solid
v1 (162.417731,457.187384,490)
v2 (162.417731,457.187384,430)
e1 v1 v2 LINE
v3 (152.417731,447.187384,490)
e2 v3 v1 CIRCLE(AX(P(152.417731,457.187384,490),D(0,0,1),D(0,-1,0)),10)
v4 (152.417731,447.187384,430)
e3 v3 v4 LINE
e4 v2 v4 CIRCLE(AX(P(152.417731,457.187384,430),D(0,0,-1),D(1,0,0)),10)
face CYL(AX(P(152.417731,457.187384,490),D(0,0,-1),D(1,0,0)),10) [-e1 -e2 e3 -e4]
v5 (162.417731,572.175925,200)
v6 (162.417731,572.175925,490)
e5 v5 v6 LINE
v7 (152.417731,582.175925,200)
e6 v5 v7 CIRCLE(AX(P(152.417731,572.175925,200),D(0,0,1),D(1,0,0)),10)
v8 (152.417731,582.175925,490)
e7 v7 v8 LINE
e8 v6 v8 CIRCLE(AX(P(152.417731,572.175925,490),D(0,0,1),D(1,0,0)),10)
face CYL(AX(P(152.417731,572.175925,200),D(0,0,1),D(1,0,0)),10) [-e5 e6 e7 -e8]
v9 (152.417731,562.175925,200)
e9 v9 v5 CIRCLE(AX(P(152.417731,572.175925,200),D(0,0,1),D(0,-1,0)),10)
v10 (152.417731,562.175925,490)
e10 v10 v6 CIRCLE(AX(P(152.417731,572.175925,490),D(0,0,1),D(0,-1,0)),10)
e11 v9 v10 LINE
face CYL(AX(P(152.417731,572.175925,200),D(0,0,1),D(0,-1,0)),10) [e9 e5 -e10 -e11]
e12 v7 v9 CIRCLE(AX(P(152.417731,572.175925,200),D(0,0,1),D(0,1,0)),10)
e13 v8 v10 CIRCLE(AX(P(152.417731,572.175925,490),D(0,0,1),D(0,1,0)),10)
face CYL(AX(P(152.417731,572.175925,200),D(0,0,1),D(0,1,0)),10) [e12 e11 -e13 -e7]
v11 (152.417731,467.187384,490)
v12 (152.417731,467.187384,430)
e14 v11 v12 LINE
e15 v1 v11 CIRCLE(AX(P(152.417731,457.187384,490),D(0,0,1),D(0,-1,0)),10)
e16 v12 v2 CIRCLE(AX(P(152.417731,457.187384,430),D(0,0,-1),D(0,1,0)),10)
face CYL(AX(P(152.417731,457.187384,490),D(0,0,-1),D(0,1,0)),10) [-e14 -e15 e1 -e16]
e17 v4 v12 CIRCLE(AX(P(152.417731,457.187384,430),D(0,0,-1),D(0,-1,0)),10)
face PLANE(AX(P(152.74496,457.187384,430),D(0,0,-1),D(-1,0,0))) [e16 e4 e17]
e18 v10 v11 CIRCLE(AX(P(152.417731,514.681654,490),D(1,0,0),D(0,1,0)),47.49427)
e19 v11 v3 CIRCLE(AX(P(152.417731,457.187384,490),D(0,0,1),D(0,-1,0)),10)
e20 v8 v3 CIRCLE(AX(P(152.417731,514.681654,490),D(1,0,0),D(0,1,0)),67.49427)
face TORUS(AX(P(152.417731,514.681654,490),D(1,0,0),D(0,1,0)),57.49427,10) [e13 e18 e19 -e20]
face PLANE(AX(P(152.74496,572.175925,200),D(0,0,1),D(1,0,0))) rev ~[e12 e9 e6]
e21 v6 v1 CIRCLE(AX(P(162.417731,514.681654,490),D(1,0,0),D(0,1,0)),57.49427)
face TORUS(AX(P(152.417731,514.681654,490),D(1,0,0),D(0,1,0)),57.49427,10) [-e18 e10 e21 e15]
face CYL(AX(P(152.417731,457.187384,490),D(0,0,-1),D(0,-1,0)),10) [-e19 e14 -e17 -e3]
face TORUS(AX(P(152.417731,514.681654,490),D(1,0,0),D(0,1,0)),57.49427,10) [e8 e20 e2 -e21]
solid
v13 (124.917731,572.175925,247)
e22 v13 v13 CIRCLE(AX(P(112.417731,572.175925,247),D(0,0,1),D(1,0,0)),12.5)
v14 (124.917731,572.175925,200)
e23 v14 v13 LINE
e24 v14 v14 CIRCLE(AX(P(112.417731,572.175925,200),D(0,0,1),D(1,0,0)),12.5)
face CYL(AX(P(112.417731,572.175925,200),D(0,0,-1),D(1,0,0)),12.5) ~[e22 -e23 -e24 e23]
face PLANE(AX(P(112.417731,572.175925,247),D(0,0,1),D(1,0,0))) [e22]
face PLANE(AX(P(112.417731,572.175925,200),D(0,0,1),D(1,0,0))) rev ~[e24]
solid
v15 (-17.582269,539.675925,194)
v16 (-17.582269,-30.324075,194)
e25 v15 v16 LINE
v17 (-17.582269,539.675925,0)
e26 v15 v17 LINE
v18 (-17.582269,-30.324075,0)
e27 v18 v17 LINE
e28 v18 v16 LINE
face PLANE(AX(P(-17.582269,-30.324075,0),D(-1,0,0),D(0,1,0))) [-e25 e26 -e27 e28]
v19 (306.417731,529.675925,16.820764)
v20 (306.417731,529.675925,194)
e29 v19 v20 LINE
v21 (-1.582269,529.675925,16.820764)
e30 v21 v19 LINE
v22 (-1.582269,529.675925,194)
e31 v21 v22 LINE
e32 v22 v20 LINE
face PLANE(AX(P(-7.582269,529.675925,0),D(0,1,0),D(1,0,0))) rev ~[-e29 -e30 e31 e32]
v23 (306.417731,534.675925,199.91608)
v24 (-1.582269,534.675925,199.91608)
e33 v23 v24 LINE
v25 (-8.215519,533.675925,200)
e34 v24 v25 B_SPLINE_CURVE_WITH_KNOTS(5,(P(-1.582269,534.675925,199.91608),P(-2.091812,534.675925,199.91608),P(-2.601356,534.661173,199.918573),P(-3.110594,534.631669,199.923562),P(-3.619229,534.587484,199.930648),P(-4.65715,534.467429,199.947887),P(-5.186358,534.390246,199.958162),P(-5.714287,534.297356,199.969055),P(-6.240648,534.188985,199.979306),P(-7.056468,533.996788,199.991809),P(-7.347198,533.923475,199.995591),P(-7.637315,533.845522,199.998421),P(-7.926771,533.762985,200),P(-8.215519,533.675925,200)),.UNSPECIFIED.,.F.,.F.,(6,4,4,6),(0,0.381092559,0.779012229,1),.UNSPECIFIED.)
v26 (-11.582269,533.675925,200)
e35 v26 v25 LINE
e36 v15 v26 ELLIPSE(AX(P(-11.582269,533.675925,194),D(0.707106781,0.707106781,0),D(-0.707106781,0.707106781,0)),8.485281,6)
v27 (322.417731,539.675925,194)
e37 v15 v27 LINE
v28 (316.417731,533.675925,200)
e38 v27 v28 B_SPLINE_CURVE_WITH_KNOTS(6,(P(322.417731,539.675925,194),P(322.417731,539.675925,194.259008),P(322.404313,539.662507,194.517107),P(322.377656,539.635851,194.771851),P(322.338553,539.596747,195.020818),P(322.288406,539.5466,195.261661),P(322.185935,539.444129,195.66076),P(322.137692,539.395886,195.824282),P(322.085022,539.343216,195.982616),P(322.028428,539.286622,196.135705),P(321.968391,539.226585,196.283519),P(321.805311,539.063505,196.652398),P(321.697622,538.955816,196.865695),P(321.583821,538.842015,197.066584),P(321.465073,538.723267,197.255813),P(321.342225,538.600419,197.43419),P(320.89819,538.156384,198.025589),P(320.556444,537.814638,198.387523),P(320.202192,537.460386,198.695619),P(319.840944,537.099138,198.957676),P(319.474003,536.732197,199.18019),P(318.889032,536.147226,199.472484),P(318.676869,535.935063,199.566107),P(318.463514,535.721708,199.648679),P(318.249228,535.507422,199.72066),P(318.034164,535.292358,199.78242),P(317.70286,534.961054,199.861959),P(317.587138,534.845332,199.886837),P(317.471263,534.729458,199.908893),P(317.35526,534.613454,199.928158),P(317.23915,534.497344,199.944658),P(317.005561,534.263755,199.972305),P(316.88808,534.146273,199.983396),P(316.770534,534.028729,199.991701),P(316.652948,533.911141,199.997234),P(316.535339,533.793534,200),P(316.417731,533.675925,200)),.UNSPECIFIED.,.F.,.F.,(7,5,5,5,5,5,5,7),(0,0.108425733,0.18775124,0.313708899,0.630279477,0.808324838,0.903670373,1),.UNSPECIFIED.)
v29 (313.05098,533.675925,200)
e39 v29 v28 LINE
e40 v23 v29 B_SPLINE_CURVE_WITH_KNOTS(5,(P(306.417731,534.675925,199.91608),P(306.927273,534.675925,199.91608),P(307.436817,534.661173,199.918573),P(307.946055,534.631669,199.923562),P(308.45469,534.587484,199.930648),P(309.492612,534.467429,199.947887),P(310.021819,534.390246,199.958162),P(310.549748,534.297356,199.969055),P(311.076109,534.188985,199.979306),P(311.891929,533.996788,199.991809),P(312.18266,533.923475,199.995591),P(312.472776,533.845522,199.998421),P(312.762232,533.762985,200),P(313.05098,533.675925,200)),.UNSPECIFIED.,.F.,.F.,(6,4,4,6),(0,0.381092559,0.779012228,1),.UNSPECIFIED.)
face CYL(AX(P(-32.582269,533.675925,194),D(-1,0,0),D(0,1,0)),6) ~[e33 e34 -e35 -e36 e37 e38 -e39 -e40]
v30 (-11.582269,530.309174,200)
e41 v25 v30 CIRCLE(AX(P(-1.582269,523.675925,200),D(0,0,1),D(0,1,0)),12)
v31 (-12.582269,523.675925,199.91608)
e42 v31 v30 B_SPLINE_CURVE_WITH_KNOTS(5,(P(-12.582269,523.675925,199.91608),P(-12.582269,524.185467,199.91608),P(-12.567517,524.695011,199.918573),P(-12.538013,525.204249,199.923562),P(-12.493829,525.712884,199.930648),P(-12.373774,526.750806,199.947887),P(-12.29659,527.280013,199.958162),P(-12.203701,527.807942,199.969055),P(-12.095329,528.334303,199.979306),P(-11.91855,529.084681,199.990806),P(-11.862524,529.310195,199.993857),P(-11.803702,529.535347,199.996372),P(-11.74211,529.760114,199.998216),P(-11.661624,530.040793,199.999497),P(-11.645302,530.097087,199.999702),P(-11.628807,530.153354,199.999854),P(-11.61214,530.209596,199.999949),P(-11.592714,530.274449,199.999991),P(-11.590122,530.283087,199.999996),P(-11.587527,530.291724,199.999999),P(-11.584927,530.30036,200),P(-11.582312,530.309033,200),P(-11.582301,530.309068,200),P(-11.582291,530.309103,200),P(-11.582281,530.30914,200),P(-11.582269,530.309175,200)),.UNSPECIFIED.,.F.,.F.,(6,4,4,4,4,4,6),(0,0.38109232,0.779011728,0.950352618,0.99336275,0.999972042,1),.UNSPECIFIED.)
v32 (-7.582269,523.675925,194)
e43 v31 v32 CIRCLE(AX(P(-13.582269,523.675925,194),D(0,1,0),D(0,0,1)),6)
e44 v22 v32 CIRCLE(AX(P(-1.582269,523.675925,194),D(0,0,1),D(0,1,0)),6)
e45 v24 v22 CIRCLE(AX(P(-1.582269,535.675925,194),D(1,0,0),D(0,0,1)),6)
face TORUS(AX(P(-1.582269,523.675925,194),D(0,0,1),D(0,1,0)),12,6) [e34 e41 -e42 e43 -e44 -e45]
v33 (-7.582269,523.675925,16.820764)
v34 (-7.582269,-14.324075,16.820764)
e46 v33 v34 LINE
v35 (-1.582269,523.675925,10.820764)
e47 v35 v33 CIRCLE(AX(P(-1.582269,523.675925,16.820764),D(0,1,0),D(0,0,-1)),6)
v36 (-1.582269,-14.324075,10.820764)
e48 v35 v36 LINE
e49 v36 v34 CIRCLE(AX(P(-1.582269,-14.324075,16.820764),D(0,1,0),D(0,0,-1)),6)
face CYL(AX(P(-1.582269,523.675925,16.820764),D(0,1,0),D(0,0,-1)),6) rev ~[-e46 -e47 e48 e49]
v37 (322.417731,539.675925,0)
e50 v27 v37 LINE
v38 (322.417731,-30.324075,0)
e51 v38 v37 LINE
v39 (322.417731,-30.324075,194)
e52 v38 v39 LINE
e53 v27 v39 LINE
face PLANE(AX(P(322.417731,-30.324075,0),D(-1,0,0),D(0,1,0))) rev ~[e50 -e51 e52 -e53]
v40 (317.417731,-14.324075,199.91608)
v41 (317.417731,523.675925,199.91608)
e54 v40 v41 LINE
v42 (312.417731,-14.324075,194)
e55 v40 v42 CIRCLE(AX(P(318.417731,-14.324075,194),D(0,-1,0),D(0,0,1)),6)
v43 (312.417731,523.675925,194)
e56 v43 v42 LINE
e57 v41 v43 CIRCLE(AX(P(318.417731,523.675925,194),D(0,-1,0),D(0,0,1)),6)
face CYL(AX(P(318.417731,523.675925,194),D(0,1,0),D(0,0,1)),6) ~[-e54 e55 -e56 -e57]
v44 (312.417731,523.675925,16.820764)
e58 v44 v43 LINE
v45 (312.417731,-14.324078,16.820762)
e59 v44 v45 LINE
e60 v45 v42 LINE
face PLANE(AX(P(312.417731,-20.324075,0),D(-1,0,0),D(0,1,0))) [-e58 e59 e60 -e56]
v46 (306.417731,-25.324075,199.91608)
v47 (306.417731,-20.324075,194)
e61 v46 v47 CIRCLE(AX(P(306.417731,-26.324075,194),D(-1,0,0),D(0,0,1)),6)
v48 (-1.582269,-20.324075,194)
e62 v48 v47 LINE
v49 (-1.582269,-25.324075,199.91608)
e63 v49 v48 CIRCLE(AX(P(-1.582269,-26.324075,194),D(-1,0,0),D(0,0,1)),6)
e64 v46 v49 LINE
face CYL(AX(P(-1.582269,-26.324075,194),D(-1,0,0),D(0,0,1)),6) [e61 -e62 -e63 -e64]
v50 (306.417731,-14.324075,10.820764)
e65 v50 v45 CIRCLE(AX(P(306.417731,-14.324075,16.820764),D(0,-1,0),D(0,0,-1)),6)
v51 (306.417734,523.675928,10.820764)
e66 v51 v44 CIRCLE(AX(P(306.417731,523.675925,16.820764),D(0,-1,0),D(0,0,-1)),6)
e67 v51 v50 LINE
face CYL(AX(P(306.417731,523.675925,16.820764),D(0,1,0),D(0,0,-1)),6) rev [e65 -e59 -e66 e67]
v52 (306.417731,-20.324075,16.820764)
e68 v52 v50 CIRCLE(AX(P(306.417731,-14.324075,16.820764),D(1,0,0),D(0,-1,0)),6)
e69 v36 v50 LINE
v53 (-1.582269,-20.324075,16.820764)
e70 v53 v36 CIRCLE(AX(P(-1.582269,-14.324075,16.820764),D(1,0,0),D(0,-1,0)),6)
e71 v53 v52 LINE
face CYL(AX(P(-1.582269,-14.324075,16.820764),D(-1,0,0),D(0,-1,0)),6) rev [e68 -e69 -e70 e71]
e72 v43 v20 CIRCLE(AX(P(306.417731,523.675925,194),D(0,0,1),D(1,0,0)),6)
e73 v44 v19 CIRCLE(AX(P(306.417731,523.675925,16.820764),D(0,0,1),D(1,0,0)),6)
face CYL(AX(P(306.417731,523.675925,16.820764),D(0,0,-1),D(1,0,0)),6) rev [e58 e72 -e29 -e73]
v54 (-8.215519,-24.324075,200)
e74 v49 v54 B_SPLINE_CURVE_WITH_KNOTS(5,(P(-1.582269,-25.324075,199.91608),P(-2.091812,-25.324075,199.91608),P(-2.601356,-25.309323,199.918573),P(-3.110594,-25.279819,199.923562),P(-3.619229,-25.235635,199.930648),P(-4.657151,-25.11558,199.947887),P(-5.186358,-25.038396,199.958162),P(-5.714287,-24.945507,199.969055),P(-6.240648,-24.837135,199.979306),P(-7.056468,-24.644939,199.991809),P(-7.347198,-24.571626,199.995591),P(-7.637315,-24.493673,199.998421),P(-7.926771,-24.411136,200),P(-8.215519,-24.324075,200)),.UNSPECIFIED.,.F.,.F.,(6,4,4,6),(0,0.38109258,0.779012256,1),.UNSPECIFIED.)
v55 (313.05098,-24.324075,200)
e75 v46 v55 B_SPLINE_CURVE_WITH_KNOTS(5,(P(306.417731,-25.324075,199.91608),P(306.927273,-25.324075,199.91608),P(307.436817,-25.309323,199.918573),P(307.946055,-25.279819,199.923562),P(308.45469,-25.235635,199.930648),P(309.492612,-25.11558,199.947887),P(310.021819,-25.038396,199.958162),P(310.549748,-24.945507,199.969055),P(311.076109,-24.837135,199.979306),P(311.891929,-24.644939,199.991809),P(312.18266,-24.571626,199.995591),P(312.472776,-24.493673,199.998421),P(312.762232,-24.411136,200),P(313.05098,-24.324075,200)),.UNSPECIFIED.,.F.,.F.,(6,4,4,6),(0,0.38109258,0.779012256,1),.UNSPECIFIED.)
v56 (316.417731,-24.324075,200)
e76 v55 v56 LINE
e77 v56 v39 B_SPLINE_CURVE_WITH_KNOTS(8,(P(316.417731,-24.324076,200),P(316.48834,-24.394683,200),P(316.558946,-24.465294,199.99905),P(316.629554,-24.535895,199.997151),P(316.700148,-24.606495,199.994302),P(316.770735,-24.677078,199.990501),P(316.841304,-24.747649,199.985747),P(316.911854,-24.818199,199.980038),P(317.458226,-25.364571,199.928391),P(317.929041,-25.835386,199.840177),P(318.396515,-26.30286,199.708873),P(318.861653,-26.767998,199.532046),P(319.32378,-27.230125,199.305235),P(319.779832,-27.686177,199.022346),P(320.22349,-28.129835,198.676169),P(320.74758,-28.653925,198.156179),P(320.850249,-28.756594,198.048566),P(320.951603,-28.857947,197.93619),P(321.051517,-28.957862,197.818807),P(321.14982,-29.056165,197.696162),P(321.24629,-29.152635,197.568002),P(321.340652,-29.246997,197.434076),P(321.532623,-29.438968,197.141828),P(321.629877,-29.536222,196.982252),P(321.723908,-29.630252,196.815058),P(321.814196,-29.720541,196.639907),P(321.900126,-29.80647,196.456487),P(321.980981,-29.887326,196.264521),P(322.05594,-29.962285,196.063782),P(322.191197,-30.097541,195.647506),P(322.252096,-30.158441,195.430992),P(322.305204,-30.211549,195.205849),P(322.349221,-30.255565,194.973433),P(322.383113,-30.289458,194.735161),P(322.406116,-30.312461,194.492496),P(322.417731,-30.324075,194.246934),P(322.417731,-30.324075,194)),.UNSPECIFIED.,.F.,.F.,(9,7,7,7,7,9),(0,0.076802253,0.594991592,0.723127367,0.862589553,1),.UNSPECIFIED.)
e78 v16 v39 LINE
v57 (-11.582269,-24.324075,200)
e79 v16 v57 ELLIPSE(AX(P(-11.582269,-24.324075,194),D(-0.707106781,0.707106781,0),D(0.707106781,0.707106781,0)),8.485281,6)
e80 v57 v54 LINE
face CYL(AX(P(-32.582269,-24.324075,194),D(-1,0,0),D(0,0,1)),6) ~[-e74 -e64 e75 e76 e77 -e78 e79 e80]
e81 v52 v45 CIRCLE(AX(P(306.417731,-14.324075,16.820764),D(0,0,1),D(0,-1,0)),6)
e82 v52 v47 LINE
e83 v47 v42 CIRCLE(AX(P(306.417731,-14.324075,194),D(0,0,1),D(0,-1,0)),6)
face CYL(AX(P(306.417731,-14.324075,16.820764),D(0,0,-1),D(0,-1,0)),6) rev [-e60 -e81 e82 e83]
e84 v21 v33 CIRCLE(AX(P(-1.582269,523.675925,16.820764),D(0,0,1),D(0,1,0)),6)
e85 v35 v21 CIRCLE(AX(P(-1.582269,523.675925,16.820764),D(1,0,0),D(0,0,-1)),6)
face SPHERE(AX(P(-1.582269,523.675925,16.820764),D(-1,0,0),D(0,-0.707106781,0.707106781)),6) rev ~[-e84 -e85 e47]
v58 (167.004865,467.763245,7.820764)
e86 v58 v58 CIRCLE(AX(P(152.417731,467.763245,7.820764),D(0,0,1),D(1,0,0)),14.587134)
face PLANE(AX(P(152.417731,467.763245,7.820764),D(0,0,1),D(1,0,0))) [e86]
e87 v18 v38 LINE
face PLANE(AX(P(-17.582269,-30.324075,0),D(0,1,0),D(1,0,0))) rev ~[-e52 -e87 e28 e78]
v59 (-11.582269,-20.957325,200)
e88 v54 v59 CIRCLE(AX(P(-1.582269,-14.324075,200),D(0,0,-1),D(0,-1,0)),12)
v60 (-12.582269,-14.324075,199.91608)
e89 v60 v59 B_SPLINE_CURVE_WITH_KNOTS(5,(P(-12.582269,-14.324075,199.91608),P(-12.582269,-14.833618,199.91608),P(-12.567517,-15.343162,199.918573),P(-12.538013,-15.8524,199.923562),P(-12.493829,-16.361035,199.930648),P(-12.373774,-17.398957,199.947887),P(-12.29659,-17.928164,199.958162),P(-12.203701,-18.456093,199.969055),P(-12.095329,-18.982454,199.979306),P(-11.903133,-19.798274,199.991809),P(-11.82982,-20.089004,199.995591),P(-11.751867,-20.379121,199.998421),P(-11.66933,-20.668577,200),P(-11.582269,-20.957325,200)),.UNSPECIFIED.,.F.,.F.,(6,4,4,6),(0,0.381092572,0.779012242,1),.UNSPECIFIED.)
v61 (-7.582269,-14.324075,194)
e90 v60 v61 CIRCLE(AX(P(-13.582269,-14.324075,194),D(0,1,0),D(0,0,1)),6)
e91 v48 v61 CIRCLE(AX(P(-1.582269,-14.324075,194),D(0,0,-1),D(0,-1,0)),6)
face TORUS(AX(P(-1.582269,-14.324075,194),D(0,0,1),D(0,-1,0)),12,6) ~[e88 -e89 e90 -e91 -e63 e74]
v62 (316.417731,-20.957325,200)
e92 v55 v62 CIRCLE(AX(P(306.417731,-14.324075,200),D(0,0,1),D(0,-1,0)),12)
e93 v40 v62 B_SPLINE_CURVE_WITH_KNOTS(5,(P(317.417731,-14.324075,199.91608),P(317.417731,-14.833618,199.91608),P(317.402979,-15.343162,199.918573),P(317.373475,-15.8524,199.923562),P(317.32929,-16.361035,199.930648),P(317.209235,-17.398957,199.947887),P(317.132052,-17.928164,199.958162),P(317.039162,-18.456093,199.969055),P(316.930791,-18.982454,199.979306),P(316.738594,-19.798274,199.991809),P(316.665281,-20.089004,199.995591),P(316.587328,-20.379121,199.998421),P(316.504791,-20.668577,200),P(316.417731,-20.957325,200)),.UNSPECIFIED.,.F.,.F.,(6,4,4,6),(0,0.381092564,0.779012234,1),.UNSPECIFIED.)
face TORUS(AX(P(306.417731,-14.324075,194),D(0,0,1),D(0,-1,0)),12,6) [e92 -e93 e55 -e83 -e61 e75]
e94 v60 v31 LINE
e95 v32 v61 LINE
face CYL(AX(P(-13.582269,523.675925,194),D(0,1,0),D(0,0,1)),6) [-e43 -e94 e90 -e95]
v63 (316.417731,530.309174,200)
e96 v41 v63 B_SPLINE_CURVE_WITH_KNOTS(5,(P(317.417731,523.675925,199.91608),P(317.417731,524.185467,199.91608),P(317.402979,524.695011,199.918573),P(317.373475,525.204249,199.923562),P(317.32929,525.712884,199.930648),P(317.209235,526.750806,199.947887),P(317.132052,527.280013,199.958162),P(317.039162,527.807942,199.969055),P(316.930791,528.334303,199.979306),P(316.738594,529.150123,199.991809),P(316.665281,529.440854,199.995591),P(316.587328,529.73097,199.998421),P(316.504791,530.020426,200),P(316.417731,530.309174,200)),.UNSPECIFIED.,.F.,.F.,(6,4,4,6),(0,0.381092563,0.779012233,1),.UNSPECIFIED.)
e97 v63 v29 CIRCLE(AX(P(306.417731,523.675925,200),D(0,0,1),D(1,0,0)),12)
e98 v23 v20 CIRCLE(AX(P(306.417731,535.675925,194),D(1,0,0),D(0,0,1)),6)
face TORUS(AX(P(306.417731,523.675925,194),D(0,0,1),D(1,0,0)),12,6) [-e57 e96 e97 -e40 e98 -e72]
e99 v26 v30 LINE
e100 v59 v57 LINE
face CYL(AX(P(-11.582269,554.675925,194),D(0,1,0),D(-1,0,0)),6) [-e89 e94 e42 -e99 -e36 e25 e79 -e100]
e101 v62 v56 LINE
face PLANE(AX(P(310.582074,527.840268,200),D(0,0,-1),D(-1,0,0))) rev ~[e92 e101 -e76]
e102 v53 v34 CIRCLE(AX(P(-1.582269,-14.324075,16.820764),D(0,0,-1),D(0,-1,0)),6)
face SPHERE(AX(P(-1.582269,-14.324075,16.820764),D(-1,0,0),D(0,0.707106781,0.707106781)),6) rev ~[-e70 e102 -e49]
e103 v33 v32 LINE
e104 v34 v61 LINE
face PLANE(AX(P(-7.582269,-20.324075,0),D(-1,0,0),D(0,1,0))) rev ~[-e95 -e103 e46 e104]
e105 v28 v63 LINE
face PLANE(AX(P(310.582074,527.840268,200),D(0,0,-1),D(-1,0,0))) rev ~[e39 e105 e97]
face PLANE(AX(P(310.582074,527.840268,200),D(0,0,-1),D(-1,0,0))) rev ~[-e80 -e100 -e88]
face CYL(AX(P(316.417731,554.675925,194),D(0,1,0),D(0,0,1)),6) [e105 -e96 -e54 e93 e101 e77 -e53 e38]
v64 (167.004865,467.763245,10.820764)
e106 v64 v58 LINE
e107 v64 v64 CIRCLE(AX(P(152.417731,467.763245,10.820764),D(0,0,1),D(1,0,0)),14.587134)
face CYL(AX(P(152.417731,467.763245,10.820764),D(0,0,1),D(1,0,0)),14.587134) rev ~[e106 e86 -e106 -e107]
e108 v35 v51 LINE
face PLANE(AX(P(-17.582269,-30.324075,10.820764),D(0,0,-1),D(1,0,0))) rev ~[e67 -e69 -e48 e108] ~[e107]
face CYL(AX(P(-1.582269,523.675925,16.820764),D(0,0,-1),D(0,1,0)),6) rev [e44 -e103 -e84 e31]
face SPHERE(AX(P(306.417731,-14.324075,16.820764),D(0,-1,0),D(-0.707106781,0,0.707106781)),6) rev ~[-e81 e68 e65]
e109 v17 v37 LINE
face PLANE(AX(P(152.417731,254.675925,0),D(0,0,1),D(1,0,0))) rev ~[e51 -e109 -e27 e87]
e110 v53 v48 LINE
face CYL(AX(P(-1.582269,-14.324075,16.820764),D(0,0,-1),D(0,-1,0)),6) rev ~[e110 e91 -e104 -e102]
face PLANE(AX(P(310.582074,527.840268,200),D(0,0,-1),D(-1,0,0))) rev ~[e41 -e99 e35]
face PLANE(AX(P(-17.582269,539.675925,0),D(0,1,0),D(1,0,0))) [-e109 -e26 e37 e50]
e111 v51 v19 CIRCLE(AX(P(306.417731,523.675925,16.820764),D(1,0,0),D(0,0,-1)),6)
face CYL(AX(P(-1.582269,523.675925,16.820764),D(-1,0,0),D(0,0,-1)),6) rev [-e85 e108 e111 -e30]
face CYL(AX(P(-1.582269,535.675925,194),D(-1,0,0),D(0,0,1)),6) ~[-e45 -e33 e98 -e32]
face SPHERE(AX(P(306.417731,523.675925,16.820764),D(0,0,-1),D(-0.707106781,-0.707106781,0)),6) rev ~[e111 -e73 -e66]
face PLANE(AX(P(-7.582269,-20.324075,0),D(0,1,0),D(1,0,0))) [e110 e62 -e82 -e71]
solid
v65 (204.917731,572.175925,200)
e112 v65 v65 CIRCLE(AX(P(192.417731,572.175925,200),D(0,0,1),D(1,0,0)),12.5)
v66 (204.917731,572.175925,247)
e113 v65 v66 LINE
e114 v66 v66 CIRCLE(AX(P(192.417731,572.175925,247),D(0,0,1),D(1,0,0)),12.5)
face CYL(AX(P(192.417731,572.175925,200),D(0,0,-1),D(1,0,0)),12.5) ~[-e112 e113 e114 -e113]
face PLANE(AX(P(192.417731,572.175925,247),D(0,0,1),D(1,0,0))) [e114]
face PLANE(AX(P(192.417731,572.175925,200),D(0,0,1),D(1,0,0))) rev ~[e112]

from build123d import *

# Parameters (mm, degrees)
F0_W         = 340
F0_H         = 570
F0_W_2       = 320
F0_H_2       = 550
F1_DEPTH     = 200
F2_W         = 340
F2_H         = 10.8207641169
F3_DEPTH     = 570
F4_T1_DEPTH  = 538
F4_T3_DEPTH  = 308
F4_T5_DEPTH  = 183.1792358831
F4_S9_W      = 6
F4_S9_H      = 6
F4_T10_DEPTH = 6
F4_S15_W     = 6
F4_S15_H     = 6
F4_T16_DEPTH = 6
F4_S21_W     = 6
F4_S21_H     = 6
F4_T22_DEPTH = 6
F4_S27_W     = 6
F4_S27_H     = 6
F4_T28_DEPTH = 6
F4_T31_DEPTH = 600
F4_T33_DEPTH = 370
F4_T35_DEPTH = 538
F4_T37_DEPTH = 308
F4_T40_ANGLE = 90
F4_T42_ANGLE = 90
F4_T44_ANGLE = 90
F4_T46_ANGLE = 90
F5_R         = 14.5871340725
F6_DEPTH     = 3
F12_R        = 12.5
F13_DEPTH    = 47


# Not quite as in the source:
# - a fillet or chamfer that OpenCascade refuses, or shapes differently, is made with other operations: its cross-section is extruded or revolved along the edge and cut away or added


with BuildPart() as f1:
    # F0 (on Top) → F1 (new body)
    with BuildSketch(Plane.XY):
        with Locations((152.4177306145, 254.675924629)):
            Rectangle(F0_W, F0_H)
        with Locations((152.4177306145, 254.675924629)):
            Rectangle(F0_W_2, F0_H_2, mode=Mode.SUBTRACT)
    extrude(amount=F1_DEPTH)

    # F2 (on face) → F3 (join, through all)
    with BuildSketch(Plane.XZ.offset(30.324075371)):
        with Locations((152.4177306145, 5.4103820585)):
            Rectangle(F2_W, F2_H)
    extrude(amount=-F3_DEPTH)

    # F4: fillet of radius 6 on 16 edges, made by hand

    # F4_s2 → F4_t1 (join)
    with BuildSketch(Plane.XZ.offset(-523.675924629)):
        with BuildLine():
            ThreePointArc((-1.5822693855, 10.8207641169), (-5.8249100726, 12.5781234298), (-7.5822693855, 16.8207641169))
            Line((-7.5822693855, 16.8207641169), (-7.5822693855, 10.8207641169))
            Line((-7.5822693855, 10.8207641169), (-1.5822693855, 10.8207641169))
        make_face()
        with BuildLine():
            ThreePointArc((306.4177306145, 10.8207641169), (310.6603713017, 12.5781234298), (312.4177306145, 16.8207641169))
            Line((312.4177306145, 16.8207641169), (312.4177306145, 10.8207641169))
            Line((312.4177306145, 10.8207641169), (306.4177306145, 10.8207641169))
        make_face()
    extrude(amount=F4_T1_DEPTH)

    # F4_s4 → F4_t3 (join)
    with BuildSketch(Plane.YZ.offset(-1.5822693855)):
        with BuildLine():
            ThreePointArc((523.675924629, 10.8207641169), (527.9185653161, 12.5781234298), (529.675924629, 16.8207641169))
            Line((529.675924629, 16.8207641169), (529.675924629, 10.8207641169))
            Line((529.675924629, 10.8207641169), (523.675924629, 10.8207641169))
        make_face()
        with BuildLine():
            ThreePointArc((-20.324075371, 16.8207641169), (-18.5667160581, 12.5781234298), (-14.324075371, 10.8207641169))
            Line((-14.324075371, 10.8207641169), (-20.324075371, 10.8207641169))
            Line((-20.324075371, 10.8207641169), (-20.324075371, 16.8207641169))
        make_face()
    extrude(amount=F4_T3_DEPTH)

    # F4_s6 → F4_t5 (join)
    with BuildSketch(Plane.XY.offset(16.8207641169)):
        with BuildLine():
            ThreePointArc((312.4177306145, 523.675924629), (310.6603713017, 527.9185653161), (306.4177306145, 529.675924629))
            Line((306.4177306145, 529.675924629), (312.4177306145, 529.675924629))
            Line((312.4177306145, 529.675924629), (312.4177306145, 523.675924629))
        make_face()
        with BuildLine():
            ThreePointArc((-1.5822693855, 529.675924629), (-5.8249100726, 527.9185653161), (-7.5822693855, 523.675924629))
            Line((-7.5822693855, 523.675924629), (-7.5822693855, 529.675924629))
            Line((-7.5822693855, 529.675924629), (-1.5822693855, 529.675924629))
        make_face()
        with BuildLine():
            ThreePointArc((-1.5822693855, -20.324075371), (-5.8249100726, -18.5667160581), (-7.5822693855, -14.324075371))
            Line((-7.5822693855, -14.324075371), (-7.5822693855, -20.324075371))
            Line((-7.5822693855, -20.324075371), (-1.5822693855, -20.324075371))
        make_face()
        with BuildLine():
            ThreePointArc((306.4177306145, -20.324075371), (310.6603713017, -18.5667160581), (312.4177306145, -14.324075371))
            Line((312.4177306145, -14.324075371), (312.4177306145, -20.324075371))
            Line((312.4177306145, -20.324075371), (306.4177306145, -20.324075371))
        make_face()
    extrude(amount=F4_T5_DEPTH)


with BuildPart() as f4_tool8:
    # F4_s9 → F4_t10 (new body)
    with BuildSketch(Plane.YZ.offset(-1.5822693855)):
        with Locations((-17.324075371, 13.8207641169)):
            Rectangle(F4_S9_W, F4_S9_H)
    extrude(amount=-F4_T10_DEPTH)

    # F4_s11 → F4_t12 (revolve, cut)
    with BuildSketch(Plane(origin=(-1.5822693855, -14.324075371, 16.8207641169), x_dir=(0, 0.7071067812, 0.7071067812), z_dir=(0, -0.7071067812, 0.7071067812))):
        with BuildLine():
            ThreePointArc((0, -6), (6, 0), (0, 6))
            Line((0, 6), (0, -6))
        make_face()
    revolve(axis=Axis((-1.5822693855, -14.324075371, 16.8207641169), (-1, 0, 0)), mode=Mode.SUBTRACT)


with BuildPart() as f1_1:
    add(f1.part)

    # F4_t7: union F4_tool8
    add(f4_tool8.part)


with BuildPart() as f4_tool14:
    # F4_s15 → F4_t16 (new body)
    with BuildSketch(Plane.YZ.offset(-1.5822693855)):
        with Locations((526.675924629, 13.8207641169)):
            Rectangle(F4_S15_W, F4_S15_H)
    extrude(amount=-F4_T16_DEPTH)

    # F4_s17 → F4_t18 (revolve, cut)
    with BuildSketch(Plane(origin=(-1.5822693855, 523.675924629, 16.8207641169), x_dir=(0, -0.7071067812, 0.7071067812), z_dir=(0, -0.7071067812, -0.7071067812))):
        with BuildLine():
            ThreePointArc((0, -6), (6, 0), (0, 6))
            Line((0, 6), (0, -6))
        make_face()
    revolve(axis=Axis((-1.5822693855, 523.675924629, 16.8207641169), (-1, 0, 0)), mode=Mode.SUBTRACT)


with BuildPart() as f1_2:
    add(f1_1.part)

    # F4_t13: union F4_tool14
    add(f4_tool14.part)


with BuildPart() as f4_tool20:
    # F4_s21 → F4_t22 (new body)
    with BuildSketch(Plane.XY.offset(16.8207641169)):
        with Locations((309.4177306145, 526.675924629)):
            Rectangle(F4_S21_W, F4_S21_H)
    extrude(amount=-F4_T22_DEPTH)

    # F4_s23 → F4_t24 (revolve, cut)
    with BuildSketch(Plane(origin=(306.4177306145, 523.675924629, 16.8207641169), x_dir=(-0.7071067812, -0.7071067812, 0), z_dir=(0.7071067812, -0.7071067812, 0))):
        with BuildLine():
            ThreePointArc((0, -6), (6, 0), (0, 6))
            Line((0, 6), (0, -6))
        make_face()
    revolve(axis=Axis((306.4177306145, 523.675924629, 16.8207641169), (0, 0, -1)), mode=Mode.SUBTRACT)


with BuildPart() as f1_3:
    add(f1_2.part)

    # F4_t19: union F4_tool20
    add(f4_tool20.part)


with BuildPart() as f4_tool26:
    # F4_s27 → F4_t28 (new body)
    with BuildSketch(Plane.XZ.offset(14.324075371)):
        with Locations((309.4177306145, 13.8207641169)):
            Rectangle(F4_S27_W, F4_S27_H)
    extrude(amount=F4_T28_DEPTH)

    # F4_s29 → F4_t30 (revolve, cut)
    with BuildSketch(Plane(origin=(306.4177306145, -14.324075371, 16.8207641169), x_dir=(-0.7071067812, 0, 0.7071067812), z_dir=(0.7071067812, 0, 0.7071067812))):
        with BuildLine():
            ThreePointArc((0, -6), (6, 0), (0, 6))
            Line((0, 6), (0, -6))
        make_face()
    revolve(axis=Axis((306.4177306145, -14.324075371, 16.8207641169), (0, -1, 0)), mode=Mode.SUBTRACT)


with BuildPart() as f1_4:
    add(f1_3.part)

    # F4_t25: union F4_tool26
    add(f4_tool26.part)

    # F4_s32 → F4_t31 (cut)
    with BuildSketch(Plane.XZ.offset(-554.675924629)):
        with BuildLine():
            ThreePointArc((-17.5822693855, 194), (-15.8249100726, 198.2426406871), (-11.5822693855, 200))
            Line((-11.5822693855, 200), (-17.5822693855, 200))
            Line((-17.5822693855, 200), (-17.5822693855, 194))
        make_face()
        with BuildLine():
            ThreePointArc((316.4177306145, 200), (320.6603713017, 198.2426406871), (322.4177306145, 194))
            Line((322.4177306145, 194), (322.4177306145, 200))
            Line((322.4177306145, 200), (316.4177306145, 200))
        make_face()
    extrude(amount=F4_T31_DEPTH, mode=Mode.SUBTRACT)

    # F4_s34 → F4_t33 (cut)
    with BuildSketch(Plane.YZ.offset(-32.5822693855)):
        with BuildLine():
            ThreePointArc((-24.324075371, 200), (-28.5667160581, 198.2426406871), (-30.324075371, 194))
            Line((-30.324075371, 194), (-30.324075371, 200))
            Line((-30.324075371, 200), (-24.324075371, 200))
        make_face()
        with BuildLine():
            ThreePointArc((539.675924629, 194), (537.9185653161, 198.2426406871), (533.675924629, 200))
            Line((533.675924629, 200), (539.675924629, 200))
            Line((539.675924629, 200), (539.675924629, 194))
        make_face()
    extrude(amount=F4_T33_DEPTH, mode=Mode.SUBTRACT)

    # F4_s36 → F4_t35 (cut)
    with BuildSketch(Plane.XZ.offset(-523.675924629)):
        with BuildLine():
            ThreePointArc((-13.5822693855, 200), (-9.3396286983, 198.2426406871), (-7.5822693855, 194))
            Line((-7.5822693855, 194), (-7.5822693855, 200))
            Line((-7.5822693855, 200), (-13.5822693855, 200))
        make_face()
        with BuildLine():
            ThreePointArc((318.4177306145, 200), (314.1750899274, 198.2426406871), (312.4177306145, 194))
            Line((312.4177306145, 194), (312.4177306145, 200))
            Line((312.4177306145, 200), (318.4177306145, 200))
        make_face()
    extrude(amount=F4_T35_DEPTH, mode=Mode.SUBTRACT)

    # F4_s38 → F4_t37 (cut)
    with BuildSketch(Plane.YZ.offset(-1.5822693855)):
        with BuildLine():
            ThreePointArc((535.675924629, 200), (531.4332839419, 198.2426406871), (529.675924629, 194))
            Line((529.675924629, 194), (529.675924629, 200))
            Line((529.675924629, 200), (535.675924629, 200))
        make_face()
        with BuildLine():
            ThreePointArc((-26.324075371, 200), (-22.0814346839, 198.2426406871), (-20.324075371, 194))
            Line((-20.324075371, 194), (-20.324075371, 200))
            Line((-20.324075371, 200), (-26.324075371, 200))
        make_face()
    extrude(amount=F4_T37_DEPTH, mode=Mode.SUBTRACT)

    # F4_s39 → F4_t40 (revolve, cut)
    with BuildSketch(Plane.YZ.offset(306.4177306145)):
        with BuildLine():
            ThreePointArc((-26.324075371, 200), (-22.0814346839, 198.2426406871), (-20.324075371, 194))
            Line((-20.324075371, 194), (-20.324075371, 200))
            Line((-20.324075371, 200), (-26.324075371, 200))
        make_face()
    revolve(axis=Axis((306.4177306145, -14.324075371, 200), (0, 0, 1)), revolution_arc=F4_T40_ANGLE, mode=Mode.SUBTRACT)

    # F4_s41 → F4_t42 (revolve, cut)
    with BuildSketch(Plane.YZ.offset(-1.5822693855)):
        with BuildLine():
            ThreePointArc((-26.324075371, 200), (-22.0814346839, 198.2426406871), (-20.324075371, 194))
            Line((-20.324075371, 194), (-20.324075371, 200))
            Line((-20.324075371, 200), (-26.324075371, 200))
        make_face()
    revolve(axis=Axis((-1.5822693855, -14.324075371, 200), (0, 0, -1)), revolution_arc=F4_T42_ANGLE, mode=Mode.SUBTRACT)

    # F4_s43 → F4_t44 (revolve, cut)
    with BuildSketch(Plane.XZ.offset(-523.675924629)):
        with BuildLine():
            ThreePointArc((318.4177306145, 200), (314.1750899274, 198.2426406871), (312.4177306145, 194))
            Line((312.4177306145, 194), (312.4177306145, 200))
            Line((312.4177306145, 200), (318.4177306145, 200))
        make_face()
    revolve(axis=Axis((306.4177306145, 523.675924629, 200), (0, 0, 1)), revolution_arc=F4_T44_ANGLE, mode=Mode.SUBTRACT)

    # F4_s45 → F4_t46 (revolve, cut)
    with BuildSketch(Plane.YZ.offset(-1.5822693855)):
        with BuildLine():
            ThreePointArc((535.675924629, 200), (531.4332839419, 198.2426406871), (529.675924629, 194))
            Line((529.675924629, 194), (529.675924629, 200))
            Line((529.675924629, 200), (535.675924629, 200))
        make_face()
    revolve(axis=Axis((-1.5822693855, 523.675924629, 200), (0, 0, 1)), revolution_arc=F4_T46_ANGLE, mode=Mode.SUBTRACT)

    # F5 (on face) → F6 (cut)
    with BuildSketch(Plane.XY.offset(10.8207641169)):
        with Locations((152.4177306145, 467.7632451057)):
            Circle(F5_R)
    extrude(amount=-F6_DEPTH, mode=Mode.SUBTRACT)


with BuildPart() as f11:
    # F11: sweep along a path in F10
    with BuildLine(Plane.YZ.offset(152.4177306145)) as f11_path:
        Line((572.175924629, 200), (572.175924629, 430))
        Line((572.175924629, 430), (572.175924629, 490))
        ThreePointArc((572.175924629, 490), (514.681654498, 547.494270131), (457.187384367, 490))
        Line((457.187384367, 490), (457.187384367, 430))
    # F8 (on offset) → F11 (sweep)
    with BuildSketch(Plane.XY.offset(200)):
        with BuildLine():
            ThreePointArc((152.4177306145, 582.175924629), (142.4177306145, 572.175924629), (152.4177306145, 562.175924629))
            Line((152.4177306145, 562.175924629), (152.4177306145, 582.175924629))
        make_face()
        with BuildLine():
            Line((152.4177306145, 582.175924629), (152.4177306145, 562.175924629))
            ThreePointArc((152.4177306145, 562.175924629), (159.4887984264, 565.1048568171), (162.4177306145, 572.175924629))
            ThreePointArc((162.4177306145, 572.175924629), (159.4887984264, 579.2469924408), (152.4177306145, 582.175924629))
        make_face()
    sweep(path=f11_path.line)


with BuildPart() as f13:
    # F12 (on offset) → F13 (new body)
    with BuildSketch(Plane.XY.offset(200)):
        with Locations((112.4177306145, 572.175924629)):
            Circle(F12_R)
    extrude(amount=F13_DEPTH)


with BuildPart() as f13b:
    # F12 (on offset) → F13, piece 2 (new body)
    with BuildSketch(Plane.XY.offset(200)):
        with Locations((192.4177306145, 572.175924629)):
            Circle(F12_R)
    extrude(amount=F13_DEPTH)


solid = Compound([f1_4.part, f11.part, f13.part, f13b.part])
